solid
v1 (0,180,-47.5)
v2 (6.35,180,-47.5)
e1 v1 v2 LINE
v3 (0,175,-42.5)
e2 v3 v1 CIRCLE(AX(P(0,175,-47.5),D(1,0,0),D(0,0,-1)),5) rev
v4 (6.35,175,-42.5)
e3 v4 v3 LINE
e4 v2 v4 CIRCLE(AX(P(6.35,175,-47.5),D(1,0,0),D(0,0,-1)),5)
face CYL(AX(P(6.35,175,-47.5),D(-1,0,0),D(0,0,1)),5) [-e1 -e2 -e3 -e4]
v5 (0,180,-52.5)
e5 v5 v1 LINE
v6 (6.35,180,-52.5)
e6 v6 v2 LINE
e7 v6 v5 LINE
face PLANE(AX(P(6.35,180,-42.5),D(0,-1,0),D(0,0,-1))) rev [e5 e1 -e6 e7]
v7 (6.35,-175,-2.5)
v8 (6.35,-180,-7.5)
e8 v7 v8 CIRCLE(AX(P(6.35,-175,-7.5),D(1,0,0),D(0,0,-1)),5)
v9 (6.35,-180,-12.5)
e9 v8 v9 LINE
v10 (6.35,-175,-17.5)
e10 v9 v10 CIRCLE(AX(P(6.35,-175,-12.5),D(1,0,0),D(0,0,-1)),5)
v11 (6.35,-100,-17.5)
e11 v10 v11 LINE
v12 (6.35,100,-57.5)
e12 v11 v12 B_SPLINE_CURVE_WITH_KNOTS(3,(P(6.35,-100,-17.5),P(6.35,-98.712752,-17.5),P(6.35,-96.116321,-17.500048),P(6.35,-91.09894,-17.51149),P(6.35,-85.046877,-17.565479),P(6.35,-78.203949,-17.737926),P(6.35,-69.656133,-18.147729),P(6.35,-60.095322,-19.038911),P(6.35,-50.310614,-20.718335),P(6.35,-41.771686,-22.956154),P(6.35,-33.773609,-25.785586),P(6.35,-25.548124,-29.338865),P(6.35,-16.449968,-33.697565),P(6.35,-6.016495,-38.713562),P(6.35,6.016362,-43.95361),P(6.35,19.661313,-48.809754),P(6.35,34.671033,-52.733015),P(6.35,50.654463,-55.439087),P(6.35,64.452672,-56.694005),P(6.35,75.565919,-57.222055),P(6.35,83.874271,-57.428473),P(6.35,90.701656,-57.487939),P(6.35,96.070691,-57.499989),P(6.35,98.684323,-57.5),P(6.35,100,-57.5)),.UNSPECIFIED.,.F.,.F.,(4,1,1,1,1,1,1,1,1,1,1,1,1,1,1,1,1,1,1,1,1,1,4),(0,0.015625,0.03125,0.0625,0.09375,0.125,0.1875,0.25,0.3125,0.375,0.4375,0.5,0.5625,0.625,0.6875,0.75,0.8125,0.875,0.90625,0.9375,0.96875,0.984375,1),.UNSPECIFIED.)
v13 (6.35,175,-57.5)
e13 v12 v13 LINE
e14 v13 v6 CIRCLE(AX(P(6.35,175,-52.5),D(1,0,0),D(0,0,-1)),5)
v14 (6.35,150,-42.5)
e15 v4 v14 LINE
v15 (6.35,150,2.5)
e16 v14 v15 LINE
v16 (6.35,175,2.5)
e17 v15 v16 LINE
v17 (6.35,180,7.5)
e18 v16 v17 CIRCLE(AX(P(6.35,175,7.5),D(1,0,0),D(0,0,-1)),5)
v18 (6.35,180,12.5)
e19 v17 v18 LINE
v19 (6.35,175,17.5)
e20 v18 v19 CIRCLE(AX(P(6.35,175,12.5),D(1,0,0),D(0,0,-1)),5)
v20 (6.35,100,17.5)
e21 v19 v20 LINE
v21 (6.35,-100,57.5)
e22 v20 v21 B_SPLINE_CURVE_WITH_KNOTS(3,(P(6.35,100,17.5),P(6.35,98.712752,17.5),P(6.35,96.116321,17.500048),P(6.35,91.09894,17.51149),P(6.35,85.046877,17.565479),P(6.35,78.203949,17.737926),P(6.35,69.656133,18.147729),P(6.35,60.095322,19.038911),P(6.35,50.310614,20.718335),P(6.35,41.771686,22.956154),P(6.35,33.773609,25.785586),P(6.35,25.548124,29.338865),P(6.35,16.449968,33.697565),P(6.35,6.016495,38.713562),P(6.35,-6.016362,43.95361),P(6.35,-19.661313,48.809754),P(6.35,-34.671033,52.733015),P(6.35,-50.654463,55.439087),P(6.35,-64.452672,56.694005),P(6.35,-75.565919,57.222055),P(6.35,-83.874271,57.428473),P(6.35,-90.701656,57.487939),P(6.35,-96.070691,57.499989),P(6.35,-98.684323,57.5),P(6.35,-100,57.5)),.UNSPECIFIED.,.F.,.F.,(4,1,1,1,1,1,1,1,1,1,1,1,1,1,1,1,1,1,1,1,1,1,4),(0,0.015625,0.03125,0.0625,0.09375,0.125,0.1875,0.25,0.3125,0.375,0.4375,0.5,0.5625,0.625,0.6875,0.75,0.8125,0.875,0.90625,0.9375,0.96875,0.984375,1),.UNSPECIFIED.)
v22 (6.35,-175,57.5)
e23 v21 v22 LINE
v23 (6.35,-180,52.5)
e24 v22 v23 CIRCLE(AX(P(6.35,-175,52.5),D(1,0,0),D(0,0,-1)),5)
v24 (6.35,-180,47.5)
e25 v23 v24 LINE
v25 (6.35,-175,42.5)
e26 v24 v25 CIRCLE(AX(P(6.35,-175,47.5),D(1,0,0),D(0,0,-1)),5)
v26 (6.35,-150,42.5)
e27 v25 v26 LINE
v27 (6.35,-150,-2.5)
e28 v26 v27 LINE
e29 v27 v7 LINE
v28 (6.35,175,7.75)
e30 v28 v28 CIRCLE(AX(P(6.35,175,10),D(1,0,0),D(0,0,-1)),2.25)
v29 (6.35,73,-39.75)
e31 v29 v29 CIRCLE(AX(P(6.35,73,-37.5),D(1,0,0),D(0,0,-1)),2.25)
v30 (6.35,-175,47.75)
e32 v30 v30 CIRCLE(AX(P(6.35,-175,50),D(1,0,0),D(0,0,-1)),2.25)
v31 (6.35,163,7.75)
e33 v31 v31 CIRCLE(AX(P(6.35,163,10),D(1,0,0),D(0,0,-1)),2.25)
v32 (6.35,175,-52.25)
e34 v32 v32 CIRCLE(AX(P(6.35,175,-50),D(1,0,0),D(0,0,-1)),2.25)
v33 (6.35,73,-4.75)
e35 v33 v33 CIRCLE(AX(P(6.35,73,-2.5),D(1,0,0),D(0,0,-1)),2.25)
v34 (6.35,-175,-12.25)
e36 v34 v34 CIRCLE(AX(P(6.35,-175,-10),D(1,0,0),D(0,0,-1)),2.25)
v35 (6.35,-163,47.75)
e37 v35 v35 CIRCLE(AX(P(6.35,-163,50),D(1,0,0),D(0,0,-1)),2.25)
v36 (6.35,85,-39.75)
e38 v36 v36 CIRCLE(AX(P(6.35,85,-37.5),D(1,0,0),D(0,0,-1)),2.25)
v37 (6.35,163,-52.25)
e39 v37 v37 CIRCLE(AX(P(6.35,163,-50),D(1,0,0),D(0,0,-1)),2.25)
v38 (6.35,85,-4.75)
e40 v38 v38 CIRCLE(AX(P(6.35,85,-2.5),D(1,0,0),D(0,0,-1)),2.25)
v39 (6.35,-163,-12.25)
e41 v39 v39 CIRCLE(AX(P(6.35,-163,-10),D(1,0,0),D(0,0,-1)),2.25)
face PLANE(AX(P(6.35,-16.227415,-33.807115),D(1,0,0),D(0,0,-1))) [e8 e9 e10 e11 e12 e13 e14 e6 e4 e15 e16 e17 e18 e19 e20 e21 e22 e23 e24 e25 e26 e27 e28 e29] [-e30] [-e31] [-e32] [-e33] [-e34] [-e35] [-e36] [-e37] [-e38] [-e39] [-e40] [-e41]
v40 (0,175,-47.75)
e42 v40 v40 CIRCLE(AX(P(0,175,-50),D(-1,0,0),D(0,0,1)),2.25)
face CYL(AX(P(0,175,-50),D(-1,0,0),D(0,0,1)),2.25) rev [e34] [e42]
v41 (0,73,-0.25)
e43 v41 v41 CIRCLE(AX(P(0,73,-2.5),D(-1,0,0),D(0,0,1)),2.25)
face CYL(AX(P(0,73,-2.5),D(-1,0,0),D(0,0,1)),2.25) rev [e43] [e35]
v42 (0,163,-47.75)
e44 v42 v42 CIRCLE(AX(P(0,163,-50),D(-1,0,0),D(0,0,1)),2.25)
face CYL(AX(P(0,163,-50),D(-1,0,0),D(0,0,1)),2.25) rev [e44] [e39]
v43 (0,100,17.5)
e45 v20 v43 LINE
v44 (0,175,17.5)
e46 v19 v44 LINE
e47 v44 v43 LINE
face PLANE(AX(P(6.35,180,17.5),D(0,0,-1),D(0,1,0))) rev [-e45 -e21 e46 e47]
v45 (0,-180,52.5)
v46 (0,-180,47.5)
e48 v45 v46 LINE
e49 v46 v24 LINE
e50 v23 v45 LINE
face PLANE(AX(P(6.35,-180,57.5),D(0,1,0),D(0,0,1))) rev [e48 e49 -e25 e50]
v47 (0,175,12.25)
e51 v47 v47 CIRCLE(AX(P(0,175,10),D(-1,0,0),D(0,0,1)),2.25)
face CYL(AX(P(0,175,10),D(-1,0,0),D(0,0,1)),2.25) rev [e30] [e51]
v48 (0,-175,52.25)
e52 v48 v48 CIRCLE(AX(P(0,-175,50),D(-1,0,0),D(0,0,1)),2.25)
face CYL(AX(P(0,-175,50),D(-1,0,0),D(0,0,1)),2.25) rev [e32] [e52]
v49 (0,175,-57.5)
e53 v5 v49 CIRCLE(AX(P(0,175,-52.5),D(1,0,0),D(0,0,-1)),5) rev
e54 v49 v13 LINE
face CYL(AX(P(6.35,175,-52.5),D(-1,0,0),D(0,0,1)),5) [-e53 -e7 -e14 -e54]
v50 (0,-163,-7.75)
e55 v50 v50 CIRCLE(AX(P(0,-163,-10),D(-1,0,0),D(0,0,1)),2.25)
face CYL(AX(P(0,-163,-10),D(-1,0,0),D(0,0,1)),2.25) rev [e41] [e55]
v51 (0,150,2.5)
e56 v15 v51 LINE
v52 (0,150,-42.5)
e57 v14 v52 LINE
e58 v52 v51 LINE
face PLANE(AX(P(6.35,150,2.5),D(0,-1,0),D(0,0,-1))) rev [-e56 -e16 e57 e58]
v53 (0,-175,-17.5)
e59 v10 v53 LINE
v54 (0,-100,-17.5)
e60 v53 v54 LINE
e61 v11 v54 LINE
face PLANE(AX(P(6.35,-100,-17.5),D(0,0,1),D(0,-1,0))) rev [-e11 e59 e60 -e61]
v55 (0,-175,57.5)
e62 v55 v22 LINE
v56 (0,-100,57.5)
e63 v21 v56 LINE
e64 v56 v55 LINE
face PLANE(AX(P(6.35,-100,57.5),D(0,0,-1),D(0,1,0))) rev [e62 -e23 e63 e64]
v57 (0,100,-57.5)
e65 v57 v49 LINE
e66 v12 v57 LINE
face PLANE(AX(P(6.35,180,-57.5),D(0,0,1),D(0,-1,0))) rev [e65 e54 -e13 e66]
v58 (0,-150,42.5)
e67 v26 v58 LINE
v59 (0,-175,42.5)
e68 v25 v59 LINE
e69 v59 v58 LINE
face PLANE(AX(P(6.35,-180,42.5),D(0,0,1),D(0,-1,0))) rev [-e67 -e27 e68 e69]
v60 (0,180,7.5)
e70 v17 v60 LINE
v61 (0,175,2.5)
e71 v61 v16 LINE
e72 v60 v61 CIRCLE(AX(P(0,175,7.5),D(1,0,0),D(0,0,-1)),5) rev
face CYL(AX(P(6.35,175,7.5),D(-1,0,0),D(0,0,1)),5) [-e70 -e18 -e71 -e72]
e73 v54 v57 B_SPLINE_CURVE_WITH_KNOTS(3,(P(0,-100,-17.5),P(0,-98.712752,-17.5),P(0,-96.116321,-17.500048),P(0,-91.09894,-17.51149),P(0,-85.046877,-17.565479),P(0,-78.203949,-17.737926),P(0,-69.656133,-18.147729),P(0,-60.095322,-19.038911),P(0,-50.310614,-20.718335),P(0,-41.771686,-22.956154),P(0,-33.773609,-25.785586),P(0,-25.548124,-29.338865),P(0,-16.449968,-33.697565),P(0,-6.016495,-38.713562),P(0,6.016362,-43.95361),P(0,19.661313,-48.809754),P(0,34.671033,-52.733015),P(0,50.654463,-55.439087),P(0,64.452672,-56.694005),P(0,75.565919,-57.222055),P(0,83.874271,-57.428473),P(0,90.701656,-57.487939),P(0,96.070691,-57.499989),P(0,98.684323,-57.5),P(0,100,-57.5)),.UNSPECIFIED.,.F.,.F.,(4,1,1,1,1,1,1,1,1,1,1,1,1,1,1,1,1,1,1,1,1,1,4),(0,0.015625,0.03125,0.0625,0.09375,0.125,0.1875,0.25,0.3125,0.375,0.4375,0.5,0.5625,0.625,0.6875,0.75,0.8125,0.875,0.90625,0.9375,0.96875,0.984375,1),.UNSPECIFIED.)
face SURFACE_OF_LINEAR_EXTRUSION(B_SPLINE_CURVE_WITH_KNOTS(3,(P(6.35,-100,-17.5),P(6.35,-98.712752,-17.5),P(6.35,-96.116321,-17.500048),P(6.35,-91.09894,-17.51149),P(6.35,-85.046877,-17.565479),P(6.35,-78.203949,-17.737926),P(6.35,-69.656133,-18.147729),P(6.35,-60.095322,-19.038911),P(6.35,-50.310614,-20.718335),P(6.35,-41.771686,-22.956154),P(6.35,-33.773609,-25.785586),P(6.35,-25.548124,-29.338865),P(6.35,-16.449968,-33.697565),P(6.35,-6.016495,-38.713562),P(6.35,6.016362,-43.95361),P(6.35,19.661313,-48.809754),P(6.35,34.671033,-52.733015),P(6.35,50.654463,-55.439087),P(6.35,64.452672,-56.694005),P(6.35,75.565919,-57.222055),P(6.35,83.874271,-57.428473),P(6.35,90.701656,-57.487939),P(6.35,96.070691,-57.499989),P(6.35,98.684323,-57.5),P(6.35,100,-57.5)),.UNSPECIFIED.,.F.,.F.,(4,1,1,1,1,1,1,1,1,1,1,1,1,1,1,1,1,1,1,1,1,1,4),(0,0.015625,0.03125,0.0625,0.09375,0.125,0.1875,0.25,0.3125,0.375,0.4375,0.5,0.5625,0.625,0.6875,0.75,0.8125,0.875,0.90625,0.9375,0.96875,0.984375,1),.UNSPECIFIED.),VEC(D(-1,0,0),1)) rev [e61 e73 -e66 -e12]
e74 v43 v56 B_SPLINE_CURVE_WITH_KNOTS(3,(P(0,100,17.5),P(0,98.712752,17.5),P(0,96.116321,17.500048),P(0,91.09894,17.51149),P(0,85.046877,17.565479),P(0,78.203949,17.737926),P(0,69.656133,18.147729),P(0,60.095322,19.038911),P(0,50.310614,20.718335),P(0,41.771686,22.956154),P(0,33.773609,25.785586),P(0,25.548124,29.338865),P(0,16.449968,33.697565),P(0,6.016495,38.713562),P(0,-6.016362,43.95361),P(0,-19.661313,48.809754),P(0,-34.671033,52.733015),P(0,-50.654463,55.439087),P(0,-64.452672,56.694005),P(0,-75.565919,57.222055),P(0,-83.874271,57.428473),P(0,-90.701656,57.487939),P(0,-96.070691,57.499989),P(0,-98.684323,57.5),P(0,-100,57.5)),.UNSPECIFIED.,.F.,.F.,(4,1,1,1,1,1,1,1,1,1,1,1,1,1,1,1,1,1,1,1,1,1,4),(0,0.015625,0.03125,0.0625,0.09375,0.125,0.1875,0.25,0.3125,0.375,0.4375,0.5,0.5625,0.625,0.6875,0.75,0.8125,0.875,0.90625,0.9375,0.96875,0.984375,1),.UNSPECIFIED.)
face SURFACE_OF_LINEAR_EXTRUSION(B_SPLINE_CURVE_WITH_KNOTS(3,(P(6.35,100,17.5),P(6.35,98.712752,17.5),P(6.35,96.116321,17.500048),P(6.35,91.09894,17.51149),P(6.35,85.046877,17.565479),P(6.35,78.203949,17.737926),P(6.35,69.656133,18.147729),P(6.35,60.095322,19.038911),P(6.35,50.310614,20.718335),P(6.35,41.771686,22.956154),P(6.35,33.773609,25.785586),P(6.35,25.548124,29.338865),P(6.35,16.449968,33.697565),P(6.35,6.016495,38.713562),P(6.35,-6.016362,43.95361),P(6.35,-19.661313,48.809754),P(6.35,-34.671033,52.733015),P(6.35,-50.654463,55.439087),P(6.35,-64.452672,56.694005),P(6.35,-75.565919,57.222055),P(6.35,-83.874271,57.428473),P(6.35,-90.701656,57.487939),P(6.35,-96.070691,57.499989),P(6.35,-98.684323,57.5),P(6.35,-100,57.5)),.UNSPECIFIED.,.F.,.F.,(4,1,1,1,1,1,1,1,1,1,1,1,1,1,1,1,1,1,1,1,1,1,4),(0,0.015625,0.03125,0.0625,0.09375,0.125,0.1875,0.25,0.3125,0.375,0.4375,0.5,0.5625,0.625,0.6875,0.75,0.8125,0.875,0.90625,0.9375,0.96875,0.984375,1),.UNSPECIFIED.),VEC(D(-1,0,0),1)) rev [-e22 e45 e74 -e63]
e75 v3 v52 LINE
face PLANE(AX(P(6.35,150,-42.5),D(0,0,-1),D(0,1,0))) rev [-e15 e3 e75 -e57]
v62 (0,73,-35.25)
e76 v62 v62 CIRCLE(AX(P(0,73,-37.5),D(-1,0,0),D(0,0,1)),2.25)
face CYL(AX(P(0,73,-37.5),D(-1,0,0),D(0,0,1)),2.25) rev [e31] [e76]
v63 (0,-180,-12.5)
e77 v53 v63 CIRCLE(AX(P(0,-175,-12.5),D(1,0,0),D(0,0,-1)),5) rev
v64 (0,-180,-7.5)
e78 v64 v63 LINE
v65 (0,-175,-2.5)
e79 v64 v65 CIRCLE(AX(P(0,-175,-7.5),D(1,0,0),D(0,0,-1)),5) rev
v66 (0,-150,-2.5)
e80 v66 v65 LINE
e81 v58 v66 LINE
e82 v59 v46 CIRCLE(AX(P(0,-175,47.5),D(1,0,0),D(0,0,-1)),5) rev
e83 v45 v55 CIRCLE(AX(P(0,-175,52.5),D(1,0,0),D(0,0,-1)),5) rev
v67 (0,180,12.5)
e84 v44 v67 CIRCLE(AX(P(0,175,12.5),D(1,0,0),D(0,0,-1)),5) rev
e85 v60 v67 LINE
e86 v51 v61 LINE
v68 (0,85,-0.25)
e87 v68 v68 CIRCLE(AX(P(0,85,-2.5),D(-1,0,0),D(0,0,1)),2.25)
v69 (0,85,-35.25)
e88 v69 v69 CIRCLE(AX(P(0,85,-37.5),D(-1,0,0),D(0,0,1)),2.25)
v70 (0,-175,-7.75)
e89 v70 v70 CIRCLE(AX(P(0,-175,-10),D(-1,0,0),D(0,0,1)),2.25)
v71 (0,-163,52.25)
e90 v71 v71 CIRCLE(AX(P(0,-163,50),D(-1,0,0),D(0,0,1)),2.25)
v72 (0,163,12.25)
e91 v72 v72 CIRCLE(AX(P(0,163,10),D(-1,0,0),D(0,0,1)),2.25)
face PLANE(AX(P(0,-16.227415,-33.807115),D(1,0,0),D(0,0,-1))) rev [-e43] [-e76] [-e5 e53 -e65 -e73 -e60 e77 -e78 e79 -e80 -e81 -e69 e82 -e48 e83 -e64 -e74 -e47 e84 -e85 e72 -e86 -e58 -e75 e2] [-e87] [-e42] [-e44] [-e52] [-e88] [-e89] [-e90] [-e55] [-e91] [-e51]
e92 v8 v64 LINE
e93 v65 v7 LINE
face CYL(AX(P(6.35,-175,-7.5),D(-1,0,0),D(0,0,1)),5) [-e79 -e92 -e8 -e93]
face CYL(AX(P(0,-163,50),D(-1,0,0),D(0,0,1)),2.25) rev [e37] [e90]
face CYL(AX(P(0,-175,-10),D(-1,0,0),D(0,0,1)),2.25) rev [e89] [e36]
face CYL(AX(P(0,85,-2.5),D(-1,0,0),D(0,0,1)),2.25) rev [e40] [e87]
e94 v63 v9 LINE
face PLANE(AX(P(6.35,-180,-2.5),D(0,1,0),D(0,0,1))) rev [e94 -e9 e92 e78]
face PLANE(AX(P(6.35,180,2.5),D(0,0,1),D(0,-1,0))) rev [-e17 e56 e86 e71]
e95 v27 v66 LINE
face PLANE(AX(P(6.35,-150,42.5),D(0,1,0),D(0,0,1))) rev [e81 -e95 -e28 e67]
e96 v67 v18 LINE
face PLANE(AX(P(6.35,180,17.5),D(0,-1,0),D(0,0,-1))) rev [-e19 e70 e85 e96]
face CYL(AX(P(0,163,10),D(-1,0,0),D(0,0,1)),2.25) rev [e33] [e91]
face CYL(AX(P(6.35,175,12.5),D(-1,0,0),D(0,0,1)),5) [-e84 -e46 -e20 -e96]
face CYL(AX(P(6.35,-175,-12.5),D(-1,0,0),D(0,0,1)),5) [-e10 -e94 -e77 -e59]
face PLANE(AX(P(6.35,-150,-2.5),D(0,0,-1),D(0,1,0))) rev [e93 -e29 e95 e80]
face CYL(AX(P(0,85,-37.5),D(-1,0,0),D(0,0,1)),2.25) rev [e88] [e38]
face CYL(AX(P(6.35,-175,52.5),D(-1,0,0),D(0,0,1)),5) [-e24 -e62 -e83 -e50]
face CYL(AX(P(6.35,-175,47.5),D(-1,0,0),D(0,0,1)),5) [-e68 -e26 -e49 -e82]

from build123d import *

# Parameters (mm, degrees)
SALIENTE_EXTRUIR1_DEPTH      = 6.35
TALADRO_DE_MARGEN_PARA_M41_D = 4.5
REDONDEO1_R                  = 5


# Read off the part's stored shape, not the designer's step: Saliente-Extruir1
with BuildPart() as part:
    # Saliente-Extruir1 outline → Saliente-Extruir1 (new body)
    with BuildSketch(Plane(origin=(0, 0, 0), x_dir=(0, 0, -1), z_dir=(1, 0, 0))):
        with BuildLine():
            Line((-2.5, 180), (-17.5, 180))
            Line((-17.5, 180), (-17.5, 100))
            add(Edge.make_bspline(
                [(-17.5, 100), (-17.5, 98.712751966), (-17.500047788, 96.116321069), (-17.51148981, 91.098940131), (-17.565479393, 85.046877218), (-17.737925717, 78.203948852), (-18.147729277, 69.656133307), (-19.038911227, 60.095322328), (-20.718334539, 50.310614009), (-22.956153632, 41.771686415), (-25.785586207, 33.773608765), (-29.338865081, 25.548124026), (-33.697565336, 16.449967912), (-38.713561507, 6.016494532), (-43.953609584, -6.016361906), (-48.809754323, -19.661313126), (-52.733015331, -34.671033487), (-55.439087369, -50.654463146), (-56.694005293, -64.452671708), (-57.222054598, -75.565918854), (-57.428472519, -83.87427142), (-57.487938926, -90.701655992), (-57.499988878, -96.070691027), (-57.5, -98.684323127), (-57.5, -100)],
                knots=[0, 0, 0, 0, 0.015625, 0.03125, 0.0625, 0.09375, 0.125, 0.1875, 0.25, 0.3125, 0.375, 0.4375, 0.5, 0.5625, 0.625, 0.6875, 0.75, 0.8125, 0.875, 0.90625, 0.9375, 0.96875, 0.984375, 1, 1, 1, 1], degree=3))
            Line((-57.5, -100), (-57.5, -180))
            Line((-57.5, -180), (-42.5, -180))
            Line((-42.5, -180), (-42.5, -150))
            Line((-42.5, -150), (2.5, -150))
            Line((2.5, -150), (2.5, -180))
            Line((2.5, -180), (17.5, -180))
            Line((17.5, -180), (17.5, -100))
            add(Edge.make_bspline(
                [(17.5, -100), (17.5, -98.712751966), (17.500047788, -96.116321069), (17.51148981, -91.098940131), (17.565479393, -85.046877218), (17.737925717, -78.203948852), (18.147729277, -69.656133307), (19.038911227, -60.095322328), (20.718334539, -50.310614009), (22.956153632, -41.771686415), (25.785586207, -33.773608765), (29.338865081, -25.548124026), (33.697565336, -16.449967912), (38.713561507, -6.016494532), (43.953609584, 6.016361906), (48.809754323, 19.661313126), (52.733015331, 34.671033487), (55.439087369, 50.654463146), (56.694005293, 64.452671708), (57.222054598, 75.565918854), (57.428472519, 83.87427142), (57.487938926, 90.701655992), (57.499988878, 96.070691027), (57.5, 98.684323127), (57.5, 100)],
                knots=[0, 0, 0, 0, 0.015625, 0.03125, 0.0625, 0.09375, 0.125, 0.1875, 0.25, 0.3125, 0.375, 0.4375, 0.5, 0.5625, 0.625, 0.6875, 0.75, 0.8125, 0.875, 0.90625, 0.9375, 0.96875, 0.984375, 1, 1, 1, 1], degree=3))
            Line((57.5, 100), (57.5, 180))
            Line((57.5, 180), (42.5, 180))
            Line((42.5, 180), (42.5, 150))
            Line((42.5, 150), (-2.5, 150))
            Line((-2.5, 150), (-2.5, 180))
        make_face()
    extrude(amount=SALIENTE_EXTRUIR1_DEPTH)

    # Taladro de margen para M41 (through all)
    with Locations(Plane.ZY):
        with Locations((10, 163), (10, 175), (-50, 163), (-50, 175), (50, -175), (50, -163), (-10, -175), (-10, -163), (-2.5, 85), (-2.5, 73), (-37.5, 73), (-37.5, 85)):
            Hole(TALADRO_DE_MARGEN_PARA_M41_D / 2)

    # Redondeo1
    redondeo1_edges = [part.edges().sort_by_distance(p)[0] for p in [
        (3.175, 180, 2.5),
        (3.175, 180, -42.5),
        (3.175, 180, -57.5),
        (3.175, -180, -17.5),
        (3.175, -180, -2.5),
        (3.175, -180, 42.5),
        (3.175, -180, 57.5),
        (3.175, 180, 17.5),
    ]]
    fillet(redondeo1_edges, radius=REDONDEO1_R)


solid = part.part
